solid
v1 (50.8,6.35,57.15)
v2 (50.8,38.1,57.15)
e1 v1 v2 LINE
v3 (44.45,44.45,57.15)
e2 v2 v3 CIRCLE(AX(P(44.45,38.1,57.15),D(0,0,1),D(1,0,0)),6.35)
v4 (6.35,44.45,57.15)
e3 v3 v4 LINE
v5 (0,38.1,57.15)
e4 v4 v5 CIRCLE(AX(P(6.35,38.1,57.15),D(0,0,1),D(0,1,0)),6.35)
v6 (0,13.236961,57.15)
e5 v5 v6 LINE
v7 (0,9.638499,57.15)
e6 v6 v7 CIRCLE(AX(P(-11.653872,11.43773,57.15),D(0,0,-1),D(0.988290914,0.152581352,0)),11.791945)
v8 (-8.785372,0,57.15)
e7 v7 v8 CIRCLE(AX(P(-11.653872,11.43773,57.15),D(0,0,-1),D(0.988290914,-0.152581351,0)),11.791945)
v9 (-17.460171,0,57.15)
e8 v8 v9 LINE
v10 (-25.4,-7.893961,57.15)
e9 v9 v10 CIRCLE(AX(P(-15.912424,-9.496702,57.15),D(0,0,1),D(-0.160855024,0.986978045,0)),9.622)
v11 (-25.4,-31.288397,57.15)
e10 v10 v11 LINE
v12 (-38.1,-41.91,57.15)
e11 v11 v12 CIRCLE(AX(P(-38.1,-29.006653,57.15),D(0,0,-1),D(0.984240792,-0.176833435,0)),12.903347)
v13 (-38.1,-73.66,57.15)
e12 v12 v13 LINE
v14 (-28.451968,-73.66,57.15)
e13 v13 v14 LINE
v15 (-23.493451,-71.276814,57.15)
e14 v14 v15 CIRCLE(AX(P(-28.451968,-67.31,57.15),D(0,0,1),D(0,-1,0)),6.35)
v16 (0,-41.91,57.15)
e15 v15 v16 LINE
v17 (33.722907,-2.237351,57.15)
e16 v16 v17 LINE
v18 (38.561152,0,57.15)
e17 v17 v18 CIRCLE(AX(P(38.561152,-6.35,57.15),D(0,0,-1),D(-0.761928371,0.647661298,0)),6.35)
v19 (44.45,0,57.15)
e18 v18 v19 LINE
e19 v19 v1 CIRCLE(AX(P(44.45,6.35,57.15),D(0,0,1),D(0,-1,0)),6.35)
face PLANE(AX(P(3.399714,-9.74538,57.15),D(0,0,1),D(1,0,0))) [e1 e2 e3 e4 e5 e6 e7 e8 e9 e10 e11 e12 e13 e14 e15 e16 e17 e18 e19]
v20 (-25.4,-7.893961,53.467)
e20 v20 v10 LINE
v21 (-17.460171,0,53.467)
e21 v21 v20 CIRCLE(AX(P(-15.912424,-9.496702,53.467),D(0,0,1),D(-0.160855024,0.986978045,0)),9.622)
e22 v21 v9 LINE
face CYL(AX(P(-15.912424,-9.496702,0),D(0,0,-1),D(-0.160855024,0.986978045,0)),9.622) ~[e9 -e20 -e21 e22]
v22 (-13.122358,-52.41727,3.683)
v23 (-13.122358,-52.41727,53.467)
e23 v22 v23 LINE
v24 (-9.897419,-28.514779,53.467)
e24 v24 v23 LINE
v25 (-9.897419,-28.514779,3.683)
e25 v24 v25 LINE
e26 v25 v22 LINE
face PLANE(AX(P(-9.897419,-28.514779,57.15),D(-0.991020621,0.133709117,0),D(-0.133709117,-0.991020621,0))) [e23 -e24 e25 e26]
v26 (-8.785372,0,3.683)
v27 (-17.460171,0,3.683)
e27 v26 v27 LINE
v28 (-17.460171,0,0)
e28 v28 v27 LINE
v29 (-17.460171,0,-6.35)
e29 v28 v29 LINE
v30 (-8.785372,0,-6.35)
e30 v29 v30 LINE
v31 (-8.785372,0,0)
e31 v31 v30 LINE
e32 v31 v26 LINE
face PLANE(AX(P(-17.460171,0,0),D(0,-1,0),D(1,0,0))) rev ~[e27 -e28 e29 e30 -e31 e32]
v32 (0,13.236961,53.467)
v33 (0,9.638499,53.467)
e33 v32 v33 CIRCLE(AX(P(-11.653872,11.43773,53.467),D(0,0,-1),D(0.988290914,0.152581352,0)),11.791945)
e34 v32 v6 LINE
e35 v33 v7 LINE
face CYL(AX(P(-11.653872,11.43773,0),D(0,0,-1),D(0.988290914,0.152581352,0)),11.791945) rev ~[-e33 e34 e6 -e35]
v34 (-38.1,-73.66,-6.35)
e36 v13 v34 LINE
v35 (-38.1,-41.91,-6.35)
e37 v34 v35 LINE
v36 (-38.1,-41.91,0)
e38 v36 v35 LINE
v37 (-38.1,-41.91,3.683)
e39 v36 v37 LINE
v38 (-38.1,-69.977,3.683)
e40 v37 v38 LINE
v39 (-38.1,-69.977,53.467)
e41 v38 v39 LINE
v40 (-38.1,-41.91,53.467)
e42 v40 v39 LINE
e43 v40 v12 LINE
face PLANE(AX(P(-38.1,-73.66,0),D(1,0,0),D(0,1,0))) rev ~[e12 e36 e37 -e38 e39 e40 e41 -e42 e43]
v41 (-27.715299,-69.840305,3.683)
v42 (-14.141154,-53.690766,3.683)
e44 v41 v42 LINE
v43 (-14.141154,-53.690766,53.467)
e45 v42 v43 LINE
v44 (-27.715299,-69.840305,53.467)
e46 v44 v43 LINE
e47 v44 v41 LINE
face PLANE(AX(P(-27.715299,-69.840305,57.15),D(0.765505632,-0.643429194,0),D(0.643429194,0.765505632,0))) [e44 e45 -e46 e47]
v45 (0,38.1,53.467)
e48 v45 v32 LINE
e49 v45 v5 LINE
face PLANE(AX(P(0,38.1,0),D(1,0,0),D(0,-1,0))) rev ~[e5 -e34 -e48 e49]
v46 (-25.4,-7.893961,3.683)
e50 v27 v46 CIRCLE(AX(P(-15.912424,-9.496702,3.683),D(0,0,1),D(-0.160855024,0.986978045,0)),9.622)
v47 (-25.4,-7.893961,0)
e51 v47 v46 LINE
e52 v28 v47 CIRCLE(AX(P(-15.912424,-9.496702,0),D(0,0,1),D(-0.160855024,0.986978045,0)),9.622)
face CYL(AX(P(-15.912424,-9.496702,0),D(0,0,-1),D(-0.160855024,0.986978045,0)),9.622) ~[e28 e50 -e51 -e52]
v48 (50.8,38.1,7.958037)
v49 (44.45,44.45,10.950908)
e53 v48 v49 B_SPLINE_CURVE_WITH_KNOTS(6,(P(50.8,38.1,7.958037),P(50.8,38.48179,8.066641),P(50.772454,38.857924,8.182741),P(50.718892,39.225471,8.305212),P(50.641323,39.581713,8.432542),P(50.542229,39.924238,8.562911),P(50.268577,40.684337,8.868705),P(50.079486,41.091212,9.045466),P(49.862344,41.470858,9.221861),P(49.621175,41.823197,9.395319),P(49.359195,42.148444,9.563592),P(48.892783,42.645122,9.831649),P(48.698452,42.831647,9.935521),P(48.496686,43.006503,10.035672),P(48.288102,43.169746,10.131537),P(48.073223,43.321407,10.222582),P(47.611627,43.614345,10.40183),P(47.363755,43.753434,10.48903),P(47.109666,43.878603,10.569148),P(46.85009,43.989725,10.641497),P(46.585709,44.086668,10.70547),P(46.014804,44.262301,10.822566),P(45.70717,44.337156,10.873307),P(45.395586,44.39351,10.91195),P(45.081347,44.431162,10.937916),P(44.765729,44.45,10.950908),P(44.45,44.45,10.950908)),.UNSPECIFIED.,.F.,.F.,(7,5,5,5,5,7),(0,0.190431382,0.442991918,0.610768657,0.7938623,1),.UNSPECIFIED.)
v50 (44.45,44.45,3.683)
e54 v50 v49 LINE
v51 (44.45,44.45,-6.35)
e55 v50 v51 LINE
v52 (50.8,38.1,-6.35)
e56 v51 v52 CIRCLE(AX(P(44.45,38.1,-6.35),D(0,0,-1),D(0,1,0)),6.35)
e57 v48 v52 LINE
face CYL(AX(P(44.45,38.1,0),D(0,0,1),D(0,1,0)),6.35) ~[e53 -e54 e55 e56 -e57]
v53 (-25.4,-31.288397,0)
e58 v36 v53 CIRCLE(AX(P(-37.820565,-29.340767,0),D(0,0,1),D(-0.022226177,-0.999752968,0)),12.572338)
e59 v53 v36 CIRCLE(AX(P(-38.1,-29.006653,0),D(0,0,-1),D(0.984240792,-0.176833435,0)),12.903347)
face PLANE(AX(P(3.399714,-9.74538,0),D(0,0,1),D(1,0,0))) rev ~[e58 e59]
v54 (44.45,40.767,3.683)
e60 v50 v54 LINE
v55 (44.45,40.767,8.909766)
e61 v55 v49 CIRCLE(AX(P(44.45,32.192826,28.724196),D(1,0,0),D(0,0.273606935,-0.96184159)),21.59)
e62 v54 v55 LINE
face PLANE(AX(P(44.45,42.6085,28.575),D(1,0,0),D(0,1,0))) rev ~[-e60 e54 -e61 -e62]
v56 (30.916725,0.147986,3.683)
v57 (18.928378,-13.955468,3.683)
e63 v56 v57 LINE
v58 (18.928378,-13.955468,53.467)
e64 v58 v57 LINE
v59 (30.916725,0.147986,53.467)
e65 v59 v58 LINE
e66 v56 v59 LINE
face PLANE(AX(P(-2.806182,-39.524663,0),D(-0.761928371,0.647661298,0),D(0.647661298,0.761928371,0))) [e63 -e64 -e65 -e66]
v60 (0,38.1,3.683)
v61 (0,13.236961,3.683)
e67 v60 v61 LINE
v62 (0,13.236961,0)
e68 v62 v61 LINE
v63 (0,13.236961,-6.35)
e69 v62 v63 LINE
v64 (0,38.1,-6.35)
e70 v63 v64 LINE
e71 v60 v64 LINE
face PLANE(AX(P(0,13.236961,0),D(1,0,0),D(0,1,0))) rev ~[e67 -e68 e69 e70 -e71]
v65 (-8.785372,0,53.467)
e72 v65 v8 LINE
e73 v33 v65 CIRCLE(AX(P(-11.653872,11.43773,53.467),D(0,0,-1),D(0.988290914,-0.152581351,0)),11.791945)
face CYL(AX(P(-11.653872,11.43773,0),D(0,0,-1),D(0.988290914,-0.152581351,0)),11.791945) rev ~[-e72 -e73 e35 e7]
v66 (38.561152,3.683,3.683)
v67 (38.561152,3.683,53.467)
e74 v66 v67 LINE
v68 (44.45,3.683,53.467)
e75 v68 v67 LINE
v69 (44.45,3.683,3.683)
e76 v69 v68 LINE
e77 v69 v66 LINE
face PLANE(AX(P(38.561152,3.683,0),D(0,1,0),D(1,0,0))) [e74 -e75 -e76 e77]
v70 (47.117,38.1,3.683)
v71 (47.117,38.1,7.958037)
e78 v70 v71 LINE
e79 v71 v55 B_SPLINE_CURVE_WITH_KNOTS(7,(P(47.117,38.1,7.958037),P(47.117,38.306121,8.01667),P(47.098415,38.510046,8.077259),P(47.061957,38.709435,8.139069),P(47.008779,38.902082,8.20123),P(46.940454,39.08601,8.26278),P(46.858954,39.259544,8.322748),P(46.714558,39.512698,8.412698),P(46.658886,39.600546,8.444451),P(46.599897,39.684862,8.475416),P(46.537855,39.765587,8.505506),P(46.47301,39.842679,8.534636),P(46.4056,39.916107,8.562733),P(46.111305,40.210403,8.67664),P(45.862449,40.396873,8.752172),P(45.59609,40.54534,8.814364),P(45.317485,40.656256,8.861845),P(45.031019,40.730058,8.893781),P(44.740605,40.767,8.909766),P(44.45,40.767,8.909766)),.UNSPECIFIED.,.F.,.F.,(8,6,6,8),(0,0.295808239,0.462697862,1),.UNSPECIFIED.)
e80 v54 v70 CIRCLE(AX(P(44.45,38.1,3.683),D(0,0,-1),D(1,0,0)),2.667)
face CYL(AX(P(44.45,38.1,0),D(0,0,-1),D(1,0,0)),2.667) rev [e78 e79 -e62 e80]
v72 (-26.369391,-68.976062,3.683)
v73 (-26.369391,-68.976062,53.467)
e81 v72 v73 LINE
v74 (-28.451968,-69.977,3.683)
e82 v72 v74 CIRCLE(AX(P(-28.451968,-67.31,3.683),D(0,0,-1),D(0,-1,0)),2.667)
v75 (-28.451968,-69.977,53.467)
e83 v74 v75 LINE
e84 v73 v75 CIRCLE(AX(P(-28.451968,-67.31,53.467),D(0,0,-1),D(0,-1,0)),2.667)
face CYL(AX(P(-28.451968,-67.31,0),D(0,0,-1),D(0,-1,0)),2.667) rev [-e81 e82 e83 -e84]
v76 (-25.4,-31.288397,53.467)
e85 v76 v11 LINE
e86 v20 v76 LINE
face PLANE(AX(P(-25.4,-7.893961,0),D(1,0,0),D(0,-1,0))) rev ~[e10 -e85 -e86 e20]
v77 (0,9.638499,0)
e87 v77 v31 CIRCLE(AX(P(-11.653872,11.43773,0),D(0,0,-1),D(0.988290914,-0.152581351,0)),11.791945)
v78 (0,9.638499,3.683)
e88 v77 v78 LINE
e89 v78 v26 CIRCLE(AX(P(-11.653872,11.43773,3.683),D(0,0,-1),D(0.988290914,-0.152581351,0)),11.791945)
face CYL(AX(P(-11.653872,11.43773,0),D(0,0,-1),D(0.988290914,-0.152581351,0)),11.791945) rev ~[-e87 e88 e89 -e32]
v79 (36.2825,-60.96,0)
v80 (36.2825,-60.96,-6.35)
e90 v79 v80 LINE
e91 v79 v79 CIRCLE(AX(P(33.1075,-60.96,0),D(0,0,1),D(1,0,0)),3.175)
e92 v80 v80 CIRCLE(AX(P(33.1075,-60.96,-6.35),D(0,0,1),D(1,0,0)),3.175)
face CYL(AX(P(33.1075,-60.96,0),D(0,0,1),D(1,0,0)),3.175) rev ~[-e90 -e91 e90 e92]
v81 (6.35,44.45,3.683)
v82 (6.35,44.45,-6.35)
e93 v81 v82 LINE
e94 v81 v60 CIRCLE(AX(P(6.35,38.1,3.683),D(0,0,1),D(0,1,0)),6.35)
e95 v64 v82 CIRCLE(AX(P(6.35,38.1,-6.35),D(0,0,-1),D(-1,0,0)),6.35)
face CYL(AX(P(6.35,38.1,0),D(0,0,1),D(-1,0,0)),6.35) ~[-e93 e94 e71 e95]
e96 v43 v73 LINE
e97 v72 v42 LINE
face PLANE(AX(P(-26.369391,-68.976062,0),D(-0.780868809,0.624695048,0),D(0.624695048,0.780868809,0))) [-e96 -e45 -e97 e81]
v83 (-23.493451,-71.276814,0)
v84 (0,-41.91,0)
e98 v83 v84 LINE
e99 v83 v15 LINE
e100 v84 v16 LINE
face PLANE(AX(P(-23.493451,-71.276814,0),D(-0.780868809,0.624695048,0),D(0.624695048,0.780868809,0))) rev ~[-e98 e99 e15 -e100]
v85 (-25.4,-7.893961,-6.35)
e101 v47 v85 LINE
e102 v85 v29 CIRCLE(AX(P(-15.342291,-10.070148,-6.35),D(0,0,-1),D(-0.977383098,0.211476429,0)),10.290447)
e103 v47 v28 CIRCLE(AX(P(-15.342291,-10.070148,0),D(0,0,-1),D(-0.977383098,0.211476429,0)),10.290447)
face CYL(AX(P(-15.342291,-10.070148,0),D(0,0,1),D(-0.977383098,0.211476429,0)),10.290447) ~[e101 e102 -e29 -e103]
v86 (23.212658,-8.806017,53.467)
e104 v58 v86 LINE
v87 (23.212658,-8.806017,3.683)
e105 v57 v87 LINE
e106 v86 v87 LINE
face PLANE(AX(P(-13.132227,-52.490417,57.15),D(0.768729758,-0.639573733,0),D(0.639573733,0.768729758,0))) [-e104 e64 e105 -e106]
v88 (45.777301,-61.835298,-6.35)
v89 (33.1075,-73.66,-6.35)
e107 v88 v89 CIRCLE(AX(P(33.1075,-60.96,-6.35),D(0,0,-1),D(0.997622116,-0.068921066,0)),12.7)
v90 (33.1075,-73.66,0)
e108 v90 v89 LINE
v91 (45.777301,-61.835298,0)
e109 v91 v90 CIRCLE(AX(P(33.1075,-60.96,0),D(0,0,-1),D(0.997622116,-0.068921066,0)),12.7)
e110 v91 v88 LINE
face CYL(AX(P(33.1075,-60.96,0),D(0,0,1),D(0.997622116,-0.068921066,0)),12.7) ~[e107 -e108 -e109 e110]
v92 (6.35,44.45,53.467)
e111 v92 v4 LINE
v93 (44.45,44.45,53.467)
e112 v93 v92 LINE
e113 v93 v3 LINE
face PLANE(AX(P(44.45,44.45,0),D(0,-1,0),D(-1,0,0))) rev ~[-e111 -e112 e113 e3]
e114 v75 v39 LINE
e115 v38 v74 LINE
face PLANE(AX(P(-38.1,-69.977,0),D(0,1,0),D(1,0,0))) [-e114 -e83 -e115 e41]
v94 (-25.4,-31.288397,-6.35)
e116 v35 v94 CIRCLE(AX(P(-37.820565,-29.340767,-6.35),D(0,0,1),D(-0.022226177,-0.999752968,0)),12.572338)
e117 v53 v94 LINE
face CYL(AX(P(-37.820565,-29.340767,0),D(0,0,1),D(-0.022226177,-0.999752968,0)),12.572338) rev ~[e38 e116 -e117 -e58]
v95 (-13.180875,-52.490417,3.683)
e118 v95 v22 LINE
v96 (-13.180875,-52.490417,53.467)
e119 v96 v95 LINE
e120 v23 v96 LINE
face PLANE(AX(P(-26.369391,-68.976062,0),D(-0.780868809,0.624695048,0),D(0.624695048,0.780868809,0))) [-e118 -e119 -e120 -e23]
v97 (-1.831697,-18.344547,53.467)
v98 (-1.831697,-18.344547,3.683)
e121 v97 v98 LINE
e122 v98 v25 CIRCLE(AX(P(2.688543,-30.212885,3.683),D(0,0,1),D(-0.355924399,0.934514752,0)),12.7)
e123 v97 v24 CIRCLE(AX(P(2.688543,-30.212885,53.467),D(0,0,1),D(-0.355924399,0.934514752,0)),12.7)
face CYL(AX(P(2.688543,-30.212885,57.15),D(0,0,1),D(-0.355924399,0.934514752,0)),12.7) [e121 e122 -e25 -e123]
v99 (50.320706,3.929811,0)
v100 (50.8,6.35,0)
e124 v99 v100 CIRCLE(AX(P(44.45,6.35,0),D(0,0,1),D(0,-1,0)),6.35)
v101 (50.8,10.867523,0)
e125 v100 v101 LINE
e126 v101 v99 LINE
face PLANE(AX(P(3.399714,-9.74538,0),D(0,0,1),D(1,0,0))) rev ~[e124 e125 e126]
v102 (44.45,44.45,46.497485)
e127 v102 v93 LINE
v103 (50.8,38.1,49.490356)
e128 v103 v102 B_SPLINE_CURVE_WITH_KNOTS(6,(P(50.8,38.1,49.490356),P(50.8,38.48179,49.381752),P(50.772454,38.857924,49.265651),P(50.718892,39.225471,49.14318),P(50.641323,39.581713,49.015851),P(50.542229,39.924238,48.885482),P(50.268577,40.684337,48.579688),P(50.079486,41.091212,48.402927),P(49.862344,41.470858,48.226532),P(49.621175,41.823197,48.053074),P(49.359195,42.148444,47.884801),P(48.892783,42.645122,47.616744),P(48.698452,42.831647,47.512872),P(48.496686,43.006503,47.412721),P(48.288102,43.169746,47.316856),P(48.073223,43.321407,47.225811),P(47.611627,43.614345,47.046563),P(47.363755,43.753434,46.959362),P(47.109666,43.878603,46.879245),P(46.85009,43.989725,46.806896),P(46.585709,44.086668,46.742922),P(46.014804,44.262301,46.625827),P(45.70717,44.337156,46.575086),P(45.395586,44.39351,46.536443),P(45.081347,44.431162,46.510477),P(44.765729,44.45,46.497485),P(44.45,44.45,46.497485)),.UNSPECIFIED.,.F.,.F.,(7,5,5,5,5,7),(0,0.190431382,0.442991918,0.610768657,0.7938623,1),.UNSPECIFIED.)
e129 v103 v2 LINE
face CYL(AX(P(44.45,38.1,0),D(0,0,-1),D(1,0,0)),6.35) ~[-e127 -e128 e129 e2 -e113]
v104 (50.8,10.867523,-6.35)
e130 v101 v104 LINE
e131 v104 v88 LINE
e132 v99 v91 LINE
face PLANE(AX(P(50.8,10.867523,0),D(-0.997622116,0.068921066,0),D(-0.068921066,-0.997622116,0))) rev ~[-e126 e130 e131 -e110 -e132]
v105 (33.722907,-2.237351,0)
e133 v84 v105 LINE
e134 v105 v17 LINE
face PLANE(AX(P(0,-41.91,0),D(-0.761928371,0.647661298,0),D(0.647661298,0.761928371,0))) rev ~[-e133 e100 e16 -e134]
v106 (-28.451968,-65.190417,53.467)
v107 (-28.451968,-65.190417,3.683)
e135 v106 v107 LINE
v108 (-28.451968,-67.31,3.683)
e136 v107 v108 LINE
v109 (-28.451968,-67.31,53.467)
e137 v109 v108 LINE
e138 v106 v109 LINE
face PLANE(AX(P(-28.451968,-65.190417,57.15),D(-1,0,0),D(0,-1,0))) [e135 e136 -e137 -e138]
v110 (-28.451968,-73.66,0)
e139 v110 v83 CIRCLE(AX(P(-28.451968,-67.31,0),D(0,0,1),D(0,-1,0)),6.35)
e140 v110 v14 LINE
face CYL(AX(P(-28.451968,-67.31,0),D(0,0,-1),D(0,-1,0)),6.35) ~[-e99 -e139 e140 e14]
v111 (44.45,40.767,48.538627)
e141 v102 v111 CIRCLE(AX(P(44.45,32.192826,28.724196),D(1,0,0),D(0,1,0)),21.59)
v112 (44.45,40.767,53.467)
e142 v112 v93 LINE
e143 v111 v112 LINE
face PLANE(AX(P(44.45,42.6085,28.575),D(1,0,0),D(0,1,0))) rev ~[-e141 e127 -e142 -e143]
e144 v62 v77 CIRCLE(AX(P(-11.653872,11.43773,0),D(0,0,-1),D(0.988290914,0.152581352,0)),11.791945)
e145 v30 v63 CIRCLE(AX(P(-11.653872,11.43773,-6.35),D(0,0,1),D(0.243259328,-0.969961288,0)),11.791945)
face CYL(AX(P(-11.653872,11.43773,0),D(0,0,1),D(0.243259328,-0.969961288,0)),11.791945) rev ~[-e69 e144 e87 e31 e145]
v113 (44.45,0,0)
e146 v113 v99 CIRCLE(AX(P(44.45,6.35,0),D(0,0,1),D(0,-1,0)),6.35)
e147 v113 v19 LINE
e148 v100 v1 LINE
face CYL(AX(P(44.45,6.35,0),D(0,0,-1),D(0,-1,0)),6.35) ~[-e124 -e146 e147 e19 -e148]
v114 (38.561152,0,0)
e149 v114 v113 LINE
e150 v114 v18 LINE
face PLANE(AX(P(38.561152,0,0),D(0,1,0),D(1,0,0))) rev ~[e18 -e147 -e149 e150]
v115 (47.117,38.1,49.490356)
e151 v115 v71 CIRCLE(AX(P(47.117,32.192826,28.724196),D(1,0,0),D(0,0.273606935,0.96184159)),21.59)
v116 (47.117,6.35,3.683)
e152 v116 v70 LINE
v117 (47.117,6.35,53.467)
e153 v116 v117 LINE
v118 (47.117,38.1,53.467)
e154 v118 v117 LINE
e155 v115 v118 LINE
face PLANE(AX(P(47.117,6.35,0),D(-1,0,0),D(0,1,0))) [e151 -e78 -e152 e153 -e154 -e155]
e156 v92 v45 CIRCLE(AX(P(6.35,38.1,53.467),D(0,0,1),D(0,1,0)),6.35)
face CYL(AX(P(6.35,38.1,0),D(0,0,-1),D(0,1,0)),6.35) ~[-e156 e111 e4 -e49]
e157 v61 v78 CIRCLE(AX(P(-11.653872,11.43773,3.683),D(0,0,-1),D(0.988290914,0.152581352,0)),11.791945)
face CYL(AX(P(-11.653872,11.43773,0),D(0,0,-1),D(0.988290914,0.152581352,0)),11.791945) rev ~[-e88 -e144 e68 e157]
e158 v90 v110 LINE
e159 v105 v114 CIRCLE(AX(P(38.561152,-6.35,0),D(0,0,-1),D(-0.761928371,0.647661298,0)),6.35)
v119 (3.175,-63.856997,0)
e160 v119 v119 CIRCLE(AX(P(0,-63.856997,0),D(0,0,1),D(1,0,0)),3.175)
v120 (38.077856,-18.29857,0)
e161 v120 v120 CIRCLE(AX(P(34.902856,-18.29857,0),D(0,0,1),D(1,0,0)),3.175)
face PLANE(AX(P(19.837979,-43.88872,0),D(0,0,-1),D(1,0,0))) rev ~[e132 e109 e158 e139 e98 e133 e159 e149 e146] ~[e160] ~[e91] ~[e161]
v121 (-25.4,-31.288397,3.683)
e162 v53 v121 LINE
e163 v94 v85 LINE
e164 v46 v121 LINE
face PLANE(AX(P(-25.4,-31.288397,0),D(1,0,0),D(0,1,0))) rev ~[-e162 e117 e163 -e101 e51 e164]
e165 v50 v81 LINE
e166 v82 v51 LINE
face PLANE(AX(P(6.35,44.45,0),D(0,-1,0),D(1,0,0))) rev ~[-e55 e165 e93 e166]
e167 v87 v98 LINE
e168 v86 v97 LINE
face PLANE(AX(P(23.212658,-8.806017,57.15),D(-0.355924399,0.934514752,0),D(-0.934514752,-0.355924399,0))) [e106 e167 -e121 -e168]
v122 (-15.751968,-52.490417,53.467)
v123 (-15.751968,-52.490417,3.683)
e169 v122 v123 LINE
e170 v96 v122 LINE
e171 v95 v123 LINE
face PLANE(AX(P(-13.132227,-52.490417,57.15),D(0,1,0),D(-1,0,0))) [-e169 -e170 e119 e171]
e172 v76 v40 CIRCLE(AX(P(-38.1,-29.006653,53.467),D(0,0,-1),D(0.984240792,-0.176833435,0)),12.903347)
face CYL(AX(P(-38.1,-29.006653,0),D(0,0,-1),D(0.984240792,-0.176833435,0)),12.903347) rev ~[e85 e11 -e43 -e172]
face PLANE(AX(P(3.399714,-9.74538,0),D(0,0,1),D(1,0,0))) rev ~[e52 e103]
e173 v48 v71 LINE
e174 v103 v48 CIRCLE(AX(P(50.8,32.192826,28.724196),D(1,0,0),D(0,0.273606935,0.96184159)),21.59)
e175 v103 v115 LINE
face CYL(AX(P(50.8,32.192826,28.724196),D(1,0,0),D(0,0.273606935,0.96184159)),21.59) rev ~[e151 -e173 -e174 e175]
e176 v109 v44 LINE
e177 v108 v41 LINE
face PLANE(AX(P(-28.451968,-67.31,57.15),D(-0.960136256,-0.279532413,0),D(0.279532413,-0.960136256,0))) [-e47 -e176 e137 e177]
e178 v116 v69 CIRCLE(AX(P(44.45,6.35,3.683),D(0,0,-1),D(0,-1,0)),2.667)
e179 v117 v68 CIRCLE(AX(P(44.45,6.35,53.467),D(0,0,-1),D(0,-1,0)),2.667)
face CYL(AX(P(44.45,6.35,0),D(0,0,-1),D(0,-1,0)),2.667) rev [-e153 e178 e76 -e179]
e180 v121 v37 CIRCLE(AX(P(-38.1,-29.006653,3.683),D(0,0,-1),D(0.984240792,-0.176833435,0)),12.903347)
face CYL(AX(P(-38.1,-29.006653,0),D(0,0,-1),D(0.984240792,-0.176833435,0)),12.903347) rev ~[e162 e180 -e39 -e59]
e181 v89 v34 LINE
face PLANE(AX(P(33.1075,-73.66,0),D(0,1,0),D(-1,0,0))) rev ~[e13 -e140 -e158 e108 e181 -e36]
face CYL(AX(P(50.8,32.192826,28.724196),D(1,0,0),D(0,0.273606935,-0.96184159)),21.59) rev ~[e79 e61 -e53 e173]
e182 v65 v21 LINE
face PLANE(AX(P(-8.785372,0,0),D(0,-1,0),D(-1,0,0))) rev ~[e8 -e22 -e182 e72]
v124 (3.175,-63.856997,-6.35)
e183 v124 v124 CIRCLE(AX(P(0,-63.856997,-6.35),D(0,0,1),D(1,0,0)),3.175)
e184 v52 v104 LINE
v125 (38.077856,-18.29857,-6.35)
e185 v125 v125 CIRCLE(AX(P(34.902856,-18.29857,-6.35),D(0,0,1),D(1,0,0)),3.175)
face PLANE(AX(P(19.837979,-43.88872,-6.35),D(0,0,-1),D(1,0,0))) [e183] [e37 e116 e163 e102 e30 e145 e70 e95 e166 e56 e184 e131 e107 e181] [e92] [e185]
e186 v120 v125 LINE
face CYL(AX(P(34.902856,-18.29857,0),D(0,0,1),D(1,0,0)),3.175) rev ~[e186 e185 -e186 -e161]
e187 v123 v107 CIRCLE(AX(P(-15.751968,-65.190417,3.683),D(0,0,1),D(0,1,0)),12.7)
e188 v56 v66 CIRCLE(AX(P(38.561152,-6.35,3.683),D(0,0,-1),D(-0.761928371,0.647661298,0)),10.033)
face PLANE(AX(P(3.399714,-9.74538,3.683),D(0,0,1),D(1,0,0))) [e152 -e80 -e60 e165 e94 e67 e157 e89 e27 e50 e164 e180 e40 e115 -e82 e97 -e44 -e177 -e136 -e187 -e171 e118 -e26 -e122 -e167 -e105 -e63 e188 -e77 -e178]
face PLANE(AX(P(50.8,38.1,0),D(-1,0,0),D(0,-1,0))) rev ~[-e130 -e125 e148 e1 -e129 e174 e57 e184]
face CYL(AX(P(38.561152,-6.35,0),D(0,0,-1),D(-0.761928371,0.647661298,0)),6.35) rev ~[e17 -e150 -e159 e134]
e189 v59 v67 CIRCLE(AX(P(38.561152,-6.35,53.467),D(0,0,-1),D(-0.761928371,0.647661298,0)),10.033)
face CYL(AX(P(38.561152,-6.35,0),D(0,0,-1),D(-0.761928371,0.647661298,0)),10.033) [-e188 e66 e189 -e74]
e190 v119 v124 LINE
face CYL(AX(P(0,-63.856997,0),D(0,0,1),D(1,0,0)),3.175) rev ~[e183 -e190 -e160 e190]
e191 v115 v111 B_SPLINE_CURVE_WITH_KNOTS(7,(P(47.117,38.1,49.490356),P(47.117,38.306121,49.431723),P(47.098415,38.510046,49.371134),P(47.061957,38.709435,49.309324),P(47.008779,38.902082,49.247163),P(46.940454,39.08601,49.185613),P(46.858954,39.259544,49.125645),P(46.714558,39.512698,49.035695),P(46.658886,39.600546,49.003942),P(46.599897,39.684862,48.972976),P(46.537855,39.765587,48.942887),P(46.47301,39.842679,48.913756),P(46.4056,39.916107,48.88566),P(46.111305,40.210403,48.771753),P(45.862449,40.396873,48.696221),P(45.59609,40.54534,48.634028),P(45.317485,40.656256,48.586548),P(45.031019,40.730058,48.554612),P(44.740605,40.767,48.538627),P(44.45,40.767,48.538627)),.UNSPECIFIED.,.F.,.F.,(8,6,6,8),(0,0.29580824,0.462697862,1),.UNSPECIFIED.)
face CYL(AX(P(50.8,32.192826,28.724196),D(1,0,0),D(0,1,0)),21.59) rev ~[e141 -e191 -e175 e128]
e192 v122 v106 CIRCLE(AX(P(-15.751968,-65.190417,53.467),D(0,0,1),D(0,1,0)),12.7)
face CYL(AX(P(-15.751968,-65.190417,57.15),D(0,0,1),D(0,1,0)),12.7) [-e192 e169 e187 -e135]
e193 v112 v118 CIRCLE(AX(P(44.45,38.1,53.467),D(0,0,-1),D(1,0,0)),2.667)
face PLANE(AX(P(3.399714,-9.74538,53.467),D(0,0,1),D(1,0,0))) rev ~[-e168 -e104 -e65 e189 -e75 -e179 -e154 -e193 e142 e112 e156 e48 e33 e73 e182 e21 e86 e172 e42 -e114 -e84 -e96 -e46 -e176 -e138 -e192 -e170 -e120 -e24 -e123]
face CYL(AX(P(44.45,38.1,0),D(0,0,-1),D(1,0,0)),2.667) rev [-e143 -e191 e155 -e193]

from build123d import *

# Parameters (mm, degrees)
F1_DEPTH    = 57.15
F2_T        = 3.683
F2_T3_DEPTH = 64.516
F4_DEPTH    = 25.4
F6_DEPTH    = 6.35
F7_R        = 3.175
F8_DEPTH    = 25.4
F10_DEPTH   = 56.642


# Not quite as in the source:
# - a shell that OpenCascade refuses in one call is made with other operations: the cavity is built on its own and cut out


with BuildPart() as f1:
    # F0 (on Top) → F1 (new body)
    with BuildSketch(Plane.XY):
        with BuildLine():
            ThreePointArc((33.7229068752, -2.2373507569), (35.8958962, -0.5864150612), (38.5611520326, 0))
            Line((38.5611520326, 0), (44.45, 0))
            ThreePointArc((44.45, 0), (48.9401280605, 1.8598719395), (50.8, 6.35))
            Line((50.8, 6.35), (50.8, 38.1))
            ThreePointArc((50.8, 38.1), (48.9401280605, 42.5901280605), (44.45, 44.45))
            Line((44.45, 44.45), (6.35, 44.45))
            ThreePointArc((6.35, 44.45), (1.8598719395, 42.5901280605), (0, 38.1))
            Line((0, 38.1), (0, 13.2369613275))
            ThreePointArc((0, 13.2369613275), (0.138072898, 11.4377303868), (0, 9.6384994461))
            ThreePointArc((0, 9.6384994461), (-2.9389427728, 3.4941811086), (-8.7853716686, 0))
            Line((-8.7853716686, 0), (-17.4601711333, 0))
            ThreePointArc((-17.4601711333, 0), (-22.6964673635, -2.6732403398), (-25.4, -7.893960923))
            Line((-25.4, -7.893960923), (-25.4, -31.2883965671))
            ThreePointArc((-25.4, -31.2883965671), (-29.8218894142, -38.9045945069), (-38.1, -41.91))
            Line((-38.1, -41.91), (-38.1, -73.66))
            Line((-38.1, -73.66), (-28.4519677815, -73.66))
            ThreePointArc((-28.4519677815, -73.66), (-25.7012193429, -73.0332755505), (-23.4934508416, -71.276813552))
            Line((-23.4934508416, -71.276813552), (0, -41.91))
            Line((0, -41.91), (33.7229068752, -2.2373507569))
        make_face()
    extrude(amount=F1_DEPTH)

    # F2: shell of thickness 3.683, made by hand


with BuildPart() as f2_core1:
    # F2_t2: copy of F1
    add(f1.part)

    # the walls: a layer under each face that stays
    f2_faces = [f2_core1.faces().sort_by_distance(p)[0] for p in [
        (35.8958962, -0.5864150612, 28.575),
        (6.35, -14.605, 57.15),
        (-11.7467254208, -56.593406776, 28.575),
        (-25.7012193429, -73.0332755505, 28.575),
        (-33.2759838908, -73.66, 28.575),
        (48.9401280605, 42.5901280605, 28.575),
        (50.8, 22.225, 28.575),
        (48.9401280605, 1.8598719395, 28.575),
        (6.35, -14.605, 0),
        (41.5055760163, 0, 28.575),
        (16.8614534376, -22.0736753784, 28.575),
    ]]
    thicken(f2_faces, amount=-F2_T, mode=Mode.SUBTRACT)

    # F2_s4 → F2_t3 (cut)
    with BuildSketch(Plane.XY.offset(-3.683)):
        Polygon((0.0568212202, -41.9568608842), (-2.8759398252, -39.6092481399), (-2.8416905769, -39.5664365795), (-2.8061821913, -39.524663439), align=None)
    extrude(amount=F2_T3_DEPTH, mode=Mode.SUBTRACT)


with BuildPart() as f1_1:
    add(f1.part)

    # what is left inside the walls is the cavity
    f2_cavity = [f2_core1.part.solids().sort_by_distance(p)[0] for p in [
        (15.160625, 19.021778, 3.71983),
    ]]
    add(f2_cavity, mode=Mode.SUBTRACT)

    # F3 (on face) → F4 (cut)
    with BuildSketch(Plane.YZ.offset(50.8)):
        with BuildLine():
            ThreePointArc((38.1, 7.9580365134), (49.4216390683, 15.7128126042), (53.7828262711, 28.7241964505))
            ThreePointArc((53.7828262711, 28.7241964505), (49.4216390683, 41.7355802968), (38.1, 49.4903563877))
            Line((38.1, 49.4903563877), (38.1, 7.9580365134))
        make_face()
        with BuildLine():
            Line((38.1, 7.9580365134), (38.1, 49.4903563877))
            ThreePointArc((38.1, 49.4903563877), (10.6028262711, 28.7241964505), (38.1, 7.9580365134))
        make_face()
    extrude(amount=-F4_DEPTH, mode=Mode.SUBTRACT)

    # F5 (on face) → F6 (join)
    with BuildSketch(Plane(origin=(0, 0, 0), x_dir=(1, 0, 0), z_dir=(0, 0, -1))):
        with BuildLine():
            Line((33.1074998051, 73.66), (-28.4519677815, 73.66))
            ThreePointArc((-28.4519677815, 73.66), (-25.7012193429, 73.0332755505), (-23.4934508416, 71.276813552))
            Line((-23.4934508416, 71.276813552), (0, 41.91))
            Line((0, 41.91), (33.7229068752, 2.2373507569))
            ThreePointArc((33.7229068752, 2.2373507569), (35.8958962, 0.5864150612), (38.5611520326, 0))
            Line((38.5611520326, 0), (44.45, 0))
            ThreePointArc((44.45, 0), (47.9823010709, -1.0731307441), (50.3207058028, -3.9298112931))
            Line((50.3207058028, -3.9298112931), (45.77730068, 61.8352975433))
            ThreePointArc((45.77730068, 61.8352975433), (41.7727672909, 70.2445645778), (33.1074998051, 73.66))
        make_face()
        with BuildLine():
            Line((-28.4519677815, 73.66), (-38.1, 73.66))
            Line((-38.1, 73.66), (-38.1, 41.91))
            ThreePointArc((-38.1, 41.91), (-29.7548118209, 38.9847975987), (-25.4, 31.2883965671))
            Line((-25.4, 31.2883965671), (-25.4, 7.893960923))
            ThreePointArc((-25.4, 7.893960923), (-22.5976268538, 2.7726551632), (-17.4601711333, 0))
            Line((-17.4601711333, 0), (-8.7853716686, 0))
            ThreePointArc((-8.7853716686, 0), (-1.8289491462, -4.9169285395), (0, -13.2369613275))
            Line((0, -13.2369613275), (0, -38.1))
            ThreePointArc((0, -38.1), (1.8598719395, -42.5901280605), (6.35, -44.45))
            Line((6.35, -44.45), (44.45, -44.45))
            ThreePointArc((44.45, -44.45), (48.9401280605, -42.5901280605), (50.8, -38.1))
            Line((50.8, -38.1), (50.8, -10.8675230294))
            Line((50.8, -10.8675230294), (50.3207058028, -3.9298112931))
            ThreePointArc((50.3207058028, -3.9298112931), (47.9823010709, -1.0731307441), (44.45, 0))
            Line((44.45, 0), (38.5611520326, 0))
            ThreePointArc((38.5611520326, 0), (35.8958962, 0.5864150612), (33.7229068752, 2.2373507569))
            Line((33.7229068752, 2.2373507569), (0, 41.91))
            Line((0, 41.91), (-23.4934508416, 71.276813552))
            ThreePointArc((-23.4934508416, 71.276813552), (-25.7012193429, 73.0332755505), (-28.4519677815, 73.66))
        make_face()
    extrude(amount=F6_DEPTH)

    # F7 (on face) → F8 (cut)
    with BuildSketch(Plane.XY):
        with Locations((0, -63.8569965959)):
            Circle(F7_R)
        with Locations((33.1074998051, -60.96)):
            Circle(F7_R)
        with Locations((34.9028557539, -18.2985700667)):
            Circle(F7_R)
    extrude(amount=-F8_DEPTH, mode=Mode.SUBTRACT)

    # F9 (on face) → F10 (join)
    with BuildSketch(Plane.XY.offset(57.15)):
        with BuildLine():
            Line((-9.8974186925, -28.5147787669), (-13.1322266534, -52.4904169142))
            Line((-13.1322266534, -52.4904169142), (23.2126582414, -8.8060172275))
            Line((23.2126582414, -8.8060172275), (-1.8316966669, -18.3445471934))
            ThreePointArc((-1.8316966669, -18.3445471934), (-7.2620315182, -22.3213661397), (-9.8974186925, -28.5147787669))
        make_face()
        with BuildLine():
            Line((-28.4519677815, -65.1904169142), (-28.4519677815, -67.31))
            Line((-28.4519677815, -67.31), (-27.7152992785, -69.8403045535))
            Line((-27.7152992785, -69.8403045535), (-13.1322266534, -52.4904169142))
            Line((-13.1322266534, -52.4904169142), (-15.7519677815, -52.4904169142))
            ThreePointArc((-15.7519677815, -52.4904169142), (-24.7322239026, -56.2101607932), (-28.4519677815, -65.1904169142))
        make_face()
    extrude(amount=-F10_DEPTH)


solid = f1_1.part
